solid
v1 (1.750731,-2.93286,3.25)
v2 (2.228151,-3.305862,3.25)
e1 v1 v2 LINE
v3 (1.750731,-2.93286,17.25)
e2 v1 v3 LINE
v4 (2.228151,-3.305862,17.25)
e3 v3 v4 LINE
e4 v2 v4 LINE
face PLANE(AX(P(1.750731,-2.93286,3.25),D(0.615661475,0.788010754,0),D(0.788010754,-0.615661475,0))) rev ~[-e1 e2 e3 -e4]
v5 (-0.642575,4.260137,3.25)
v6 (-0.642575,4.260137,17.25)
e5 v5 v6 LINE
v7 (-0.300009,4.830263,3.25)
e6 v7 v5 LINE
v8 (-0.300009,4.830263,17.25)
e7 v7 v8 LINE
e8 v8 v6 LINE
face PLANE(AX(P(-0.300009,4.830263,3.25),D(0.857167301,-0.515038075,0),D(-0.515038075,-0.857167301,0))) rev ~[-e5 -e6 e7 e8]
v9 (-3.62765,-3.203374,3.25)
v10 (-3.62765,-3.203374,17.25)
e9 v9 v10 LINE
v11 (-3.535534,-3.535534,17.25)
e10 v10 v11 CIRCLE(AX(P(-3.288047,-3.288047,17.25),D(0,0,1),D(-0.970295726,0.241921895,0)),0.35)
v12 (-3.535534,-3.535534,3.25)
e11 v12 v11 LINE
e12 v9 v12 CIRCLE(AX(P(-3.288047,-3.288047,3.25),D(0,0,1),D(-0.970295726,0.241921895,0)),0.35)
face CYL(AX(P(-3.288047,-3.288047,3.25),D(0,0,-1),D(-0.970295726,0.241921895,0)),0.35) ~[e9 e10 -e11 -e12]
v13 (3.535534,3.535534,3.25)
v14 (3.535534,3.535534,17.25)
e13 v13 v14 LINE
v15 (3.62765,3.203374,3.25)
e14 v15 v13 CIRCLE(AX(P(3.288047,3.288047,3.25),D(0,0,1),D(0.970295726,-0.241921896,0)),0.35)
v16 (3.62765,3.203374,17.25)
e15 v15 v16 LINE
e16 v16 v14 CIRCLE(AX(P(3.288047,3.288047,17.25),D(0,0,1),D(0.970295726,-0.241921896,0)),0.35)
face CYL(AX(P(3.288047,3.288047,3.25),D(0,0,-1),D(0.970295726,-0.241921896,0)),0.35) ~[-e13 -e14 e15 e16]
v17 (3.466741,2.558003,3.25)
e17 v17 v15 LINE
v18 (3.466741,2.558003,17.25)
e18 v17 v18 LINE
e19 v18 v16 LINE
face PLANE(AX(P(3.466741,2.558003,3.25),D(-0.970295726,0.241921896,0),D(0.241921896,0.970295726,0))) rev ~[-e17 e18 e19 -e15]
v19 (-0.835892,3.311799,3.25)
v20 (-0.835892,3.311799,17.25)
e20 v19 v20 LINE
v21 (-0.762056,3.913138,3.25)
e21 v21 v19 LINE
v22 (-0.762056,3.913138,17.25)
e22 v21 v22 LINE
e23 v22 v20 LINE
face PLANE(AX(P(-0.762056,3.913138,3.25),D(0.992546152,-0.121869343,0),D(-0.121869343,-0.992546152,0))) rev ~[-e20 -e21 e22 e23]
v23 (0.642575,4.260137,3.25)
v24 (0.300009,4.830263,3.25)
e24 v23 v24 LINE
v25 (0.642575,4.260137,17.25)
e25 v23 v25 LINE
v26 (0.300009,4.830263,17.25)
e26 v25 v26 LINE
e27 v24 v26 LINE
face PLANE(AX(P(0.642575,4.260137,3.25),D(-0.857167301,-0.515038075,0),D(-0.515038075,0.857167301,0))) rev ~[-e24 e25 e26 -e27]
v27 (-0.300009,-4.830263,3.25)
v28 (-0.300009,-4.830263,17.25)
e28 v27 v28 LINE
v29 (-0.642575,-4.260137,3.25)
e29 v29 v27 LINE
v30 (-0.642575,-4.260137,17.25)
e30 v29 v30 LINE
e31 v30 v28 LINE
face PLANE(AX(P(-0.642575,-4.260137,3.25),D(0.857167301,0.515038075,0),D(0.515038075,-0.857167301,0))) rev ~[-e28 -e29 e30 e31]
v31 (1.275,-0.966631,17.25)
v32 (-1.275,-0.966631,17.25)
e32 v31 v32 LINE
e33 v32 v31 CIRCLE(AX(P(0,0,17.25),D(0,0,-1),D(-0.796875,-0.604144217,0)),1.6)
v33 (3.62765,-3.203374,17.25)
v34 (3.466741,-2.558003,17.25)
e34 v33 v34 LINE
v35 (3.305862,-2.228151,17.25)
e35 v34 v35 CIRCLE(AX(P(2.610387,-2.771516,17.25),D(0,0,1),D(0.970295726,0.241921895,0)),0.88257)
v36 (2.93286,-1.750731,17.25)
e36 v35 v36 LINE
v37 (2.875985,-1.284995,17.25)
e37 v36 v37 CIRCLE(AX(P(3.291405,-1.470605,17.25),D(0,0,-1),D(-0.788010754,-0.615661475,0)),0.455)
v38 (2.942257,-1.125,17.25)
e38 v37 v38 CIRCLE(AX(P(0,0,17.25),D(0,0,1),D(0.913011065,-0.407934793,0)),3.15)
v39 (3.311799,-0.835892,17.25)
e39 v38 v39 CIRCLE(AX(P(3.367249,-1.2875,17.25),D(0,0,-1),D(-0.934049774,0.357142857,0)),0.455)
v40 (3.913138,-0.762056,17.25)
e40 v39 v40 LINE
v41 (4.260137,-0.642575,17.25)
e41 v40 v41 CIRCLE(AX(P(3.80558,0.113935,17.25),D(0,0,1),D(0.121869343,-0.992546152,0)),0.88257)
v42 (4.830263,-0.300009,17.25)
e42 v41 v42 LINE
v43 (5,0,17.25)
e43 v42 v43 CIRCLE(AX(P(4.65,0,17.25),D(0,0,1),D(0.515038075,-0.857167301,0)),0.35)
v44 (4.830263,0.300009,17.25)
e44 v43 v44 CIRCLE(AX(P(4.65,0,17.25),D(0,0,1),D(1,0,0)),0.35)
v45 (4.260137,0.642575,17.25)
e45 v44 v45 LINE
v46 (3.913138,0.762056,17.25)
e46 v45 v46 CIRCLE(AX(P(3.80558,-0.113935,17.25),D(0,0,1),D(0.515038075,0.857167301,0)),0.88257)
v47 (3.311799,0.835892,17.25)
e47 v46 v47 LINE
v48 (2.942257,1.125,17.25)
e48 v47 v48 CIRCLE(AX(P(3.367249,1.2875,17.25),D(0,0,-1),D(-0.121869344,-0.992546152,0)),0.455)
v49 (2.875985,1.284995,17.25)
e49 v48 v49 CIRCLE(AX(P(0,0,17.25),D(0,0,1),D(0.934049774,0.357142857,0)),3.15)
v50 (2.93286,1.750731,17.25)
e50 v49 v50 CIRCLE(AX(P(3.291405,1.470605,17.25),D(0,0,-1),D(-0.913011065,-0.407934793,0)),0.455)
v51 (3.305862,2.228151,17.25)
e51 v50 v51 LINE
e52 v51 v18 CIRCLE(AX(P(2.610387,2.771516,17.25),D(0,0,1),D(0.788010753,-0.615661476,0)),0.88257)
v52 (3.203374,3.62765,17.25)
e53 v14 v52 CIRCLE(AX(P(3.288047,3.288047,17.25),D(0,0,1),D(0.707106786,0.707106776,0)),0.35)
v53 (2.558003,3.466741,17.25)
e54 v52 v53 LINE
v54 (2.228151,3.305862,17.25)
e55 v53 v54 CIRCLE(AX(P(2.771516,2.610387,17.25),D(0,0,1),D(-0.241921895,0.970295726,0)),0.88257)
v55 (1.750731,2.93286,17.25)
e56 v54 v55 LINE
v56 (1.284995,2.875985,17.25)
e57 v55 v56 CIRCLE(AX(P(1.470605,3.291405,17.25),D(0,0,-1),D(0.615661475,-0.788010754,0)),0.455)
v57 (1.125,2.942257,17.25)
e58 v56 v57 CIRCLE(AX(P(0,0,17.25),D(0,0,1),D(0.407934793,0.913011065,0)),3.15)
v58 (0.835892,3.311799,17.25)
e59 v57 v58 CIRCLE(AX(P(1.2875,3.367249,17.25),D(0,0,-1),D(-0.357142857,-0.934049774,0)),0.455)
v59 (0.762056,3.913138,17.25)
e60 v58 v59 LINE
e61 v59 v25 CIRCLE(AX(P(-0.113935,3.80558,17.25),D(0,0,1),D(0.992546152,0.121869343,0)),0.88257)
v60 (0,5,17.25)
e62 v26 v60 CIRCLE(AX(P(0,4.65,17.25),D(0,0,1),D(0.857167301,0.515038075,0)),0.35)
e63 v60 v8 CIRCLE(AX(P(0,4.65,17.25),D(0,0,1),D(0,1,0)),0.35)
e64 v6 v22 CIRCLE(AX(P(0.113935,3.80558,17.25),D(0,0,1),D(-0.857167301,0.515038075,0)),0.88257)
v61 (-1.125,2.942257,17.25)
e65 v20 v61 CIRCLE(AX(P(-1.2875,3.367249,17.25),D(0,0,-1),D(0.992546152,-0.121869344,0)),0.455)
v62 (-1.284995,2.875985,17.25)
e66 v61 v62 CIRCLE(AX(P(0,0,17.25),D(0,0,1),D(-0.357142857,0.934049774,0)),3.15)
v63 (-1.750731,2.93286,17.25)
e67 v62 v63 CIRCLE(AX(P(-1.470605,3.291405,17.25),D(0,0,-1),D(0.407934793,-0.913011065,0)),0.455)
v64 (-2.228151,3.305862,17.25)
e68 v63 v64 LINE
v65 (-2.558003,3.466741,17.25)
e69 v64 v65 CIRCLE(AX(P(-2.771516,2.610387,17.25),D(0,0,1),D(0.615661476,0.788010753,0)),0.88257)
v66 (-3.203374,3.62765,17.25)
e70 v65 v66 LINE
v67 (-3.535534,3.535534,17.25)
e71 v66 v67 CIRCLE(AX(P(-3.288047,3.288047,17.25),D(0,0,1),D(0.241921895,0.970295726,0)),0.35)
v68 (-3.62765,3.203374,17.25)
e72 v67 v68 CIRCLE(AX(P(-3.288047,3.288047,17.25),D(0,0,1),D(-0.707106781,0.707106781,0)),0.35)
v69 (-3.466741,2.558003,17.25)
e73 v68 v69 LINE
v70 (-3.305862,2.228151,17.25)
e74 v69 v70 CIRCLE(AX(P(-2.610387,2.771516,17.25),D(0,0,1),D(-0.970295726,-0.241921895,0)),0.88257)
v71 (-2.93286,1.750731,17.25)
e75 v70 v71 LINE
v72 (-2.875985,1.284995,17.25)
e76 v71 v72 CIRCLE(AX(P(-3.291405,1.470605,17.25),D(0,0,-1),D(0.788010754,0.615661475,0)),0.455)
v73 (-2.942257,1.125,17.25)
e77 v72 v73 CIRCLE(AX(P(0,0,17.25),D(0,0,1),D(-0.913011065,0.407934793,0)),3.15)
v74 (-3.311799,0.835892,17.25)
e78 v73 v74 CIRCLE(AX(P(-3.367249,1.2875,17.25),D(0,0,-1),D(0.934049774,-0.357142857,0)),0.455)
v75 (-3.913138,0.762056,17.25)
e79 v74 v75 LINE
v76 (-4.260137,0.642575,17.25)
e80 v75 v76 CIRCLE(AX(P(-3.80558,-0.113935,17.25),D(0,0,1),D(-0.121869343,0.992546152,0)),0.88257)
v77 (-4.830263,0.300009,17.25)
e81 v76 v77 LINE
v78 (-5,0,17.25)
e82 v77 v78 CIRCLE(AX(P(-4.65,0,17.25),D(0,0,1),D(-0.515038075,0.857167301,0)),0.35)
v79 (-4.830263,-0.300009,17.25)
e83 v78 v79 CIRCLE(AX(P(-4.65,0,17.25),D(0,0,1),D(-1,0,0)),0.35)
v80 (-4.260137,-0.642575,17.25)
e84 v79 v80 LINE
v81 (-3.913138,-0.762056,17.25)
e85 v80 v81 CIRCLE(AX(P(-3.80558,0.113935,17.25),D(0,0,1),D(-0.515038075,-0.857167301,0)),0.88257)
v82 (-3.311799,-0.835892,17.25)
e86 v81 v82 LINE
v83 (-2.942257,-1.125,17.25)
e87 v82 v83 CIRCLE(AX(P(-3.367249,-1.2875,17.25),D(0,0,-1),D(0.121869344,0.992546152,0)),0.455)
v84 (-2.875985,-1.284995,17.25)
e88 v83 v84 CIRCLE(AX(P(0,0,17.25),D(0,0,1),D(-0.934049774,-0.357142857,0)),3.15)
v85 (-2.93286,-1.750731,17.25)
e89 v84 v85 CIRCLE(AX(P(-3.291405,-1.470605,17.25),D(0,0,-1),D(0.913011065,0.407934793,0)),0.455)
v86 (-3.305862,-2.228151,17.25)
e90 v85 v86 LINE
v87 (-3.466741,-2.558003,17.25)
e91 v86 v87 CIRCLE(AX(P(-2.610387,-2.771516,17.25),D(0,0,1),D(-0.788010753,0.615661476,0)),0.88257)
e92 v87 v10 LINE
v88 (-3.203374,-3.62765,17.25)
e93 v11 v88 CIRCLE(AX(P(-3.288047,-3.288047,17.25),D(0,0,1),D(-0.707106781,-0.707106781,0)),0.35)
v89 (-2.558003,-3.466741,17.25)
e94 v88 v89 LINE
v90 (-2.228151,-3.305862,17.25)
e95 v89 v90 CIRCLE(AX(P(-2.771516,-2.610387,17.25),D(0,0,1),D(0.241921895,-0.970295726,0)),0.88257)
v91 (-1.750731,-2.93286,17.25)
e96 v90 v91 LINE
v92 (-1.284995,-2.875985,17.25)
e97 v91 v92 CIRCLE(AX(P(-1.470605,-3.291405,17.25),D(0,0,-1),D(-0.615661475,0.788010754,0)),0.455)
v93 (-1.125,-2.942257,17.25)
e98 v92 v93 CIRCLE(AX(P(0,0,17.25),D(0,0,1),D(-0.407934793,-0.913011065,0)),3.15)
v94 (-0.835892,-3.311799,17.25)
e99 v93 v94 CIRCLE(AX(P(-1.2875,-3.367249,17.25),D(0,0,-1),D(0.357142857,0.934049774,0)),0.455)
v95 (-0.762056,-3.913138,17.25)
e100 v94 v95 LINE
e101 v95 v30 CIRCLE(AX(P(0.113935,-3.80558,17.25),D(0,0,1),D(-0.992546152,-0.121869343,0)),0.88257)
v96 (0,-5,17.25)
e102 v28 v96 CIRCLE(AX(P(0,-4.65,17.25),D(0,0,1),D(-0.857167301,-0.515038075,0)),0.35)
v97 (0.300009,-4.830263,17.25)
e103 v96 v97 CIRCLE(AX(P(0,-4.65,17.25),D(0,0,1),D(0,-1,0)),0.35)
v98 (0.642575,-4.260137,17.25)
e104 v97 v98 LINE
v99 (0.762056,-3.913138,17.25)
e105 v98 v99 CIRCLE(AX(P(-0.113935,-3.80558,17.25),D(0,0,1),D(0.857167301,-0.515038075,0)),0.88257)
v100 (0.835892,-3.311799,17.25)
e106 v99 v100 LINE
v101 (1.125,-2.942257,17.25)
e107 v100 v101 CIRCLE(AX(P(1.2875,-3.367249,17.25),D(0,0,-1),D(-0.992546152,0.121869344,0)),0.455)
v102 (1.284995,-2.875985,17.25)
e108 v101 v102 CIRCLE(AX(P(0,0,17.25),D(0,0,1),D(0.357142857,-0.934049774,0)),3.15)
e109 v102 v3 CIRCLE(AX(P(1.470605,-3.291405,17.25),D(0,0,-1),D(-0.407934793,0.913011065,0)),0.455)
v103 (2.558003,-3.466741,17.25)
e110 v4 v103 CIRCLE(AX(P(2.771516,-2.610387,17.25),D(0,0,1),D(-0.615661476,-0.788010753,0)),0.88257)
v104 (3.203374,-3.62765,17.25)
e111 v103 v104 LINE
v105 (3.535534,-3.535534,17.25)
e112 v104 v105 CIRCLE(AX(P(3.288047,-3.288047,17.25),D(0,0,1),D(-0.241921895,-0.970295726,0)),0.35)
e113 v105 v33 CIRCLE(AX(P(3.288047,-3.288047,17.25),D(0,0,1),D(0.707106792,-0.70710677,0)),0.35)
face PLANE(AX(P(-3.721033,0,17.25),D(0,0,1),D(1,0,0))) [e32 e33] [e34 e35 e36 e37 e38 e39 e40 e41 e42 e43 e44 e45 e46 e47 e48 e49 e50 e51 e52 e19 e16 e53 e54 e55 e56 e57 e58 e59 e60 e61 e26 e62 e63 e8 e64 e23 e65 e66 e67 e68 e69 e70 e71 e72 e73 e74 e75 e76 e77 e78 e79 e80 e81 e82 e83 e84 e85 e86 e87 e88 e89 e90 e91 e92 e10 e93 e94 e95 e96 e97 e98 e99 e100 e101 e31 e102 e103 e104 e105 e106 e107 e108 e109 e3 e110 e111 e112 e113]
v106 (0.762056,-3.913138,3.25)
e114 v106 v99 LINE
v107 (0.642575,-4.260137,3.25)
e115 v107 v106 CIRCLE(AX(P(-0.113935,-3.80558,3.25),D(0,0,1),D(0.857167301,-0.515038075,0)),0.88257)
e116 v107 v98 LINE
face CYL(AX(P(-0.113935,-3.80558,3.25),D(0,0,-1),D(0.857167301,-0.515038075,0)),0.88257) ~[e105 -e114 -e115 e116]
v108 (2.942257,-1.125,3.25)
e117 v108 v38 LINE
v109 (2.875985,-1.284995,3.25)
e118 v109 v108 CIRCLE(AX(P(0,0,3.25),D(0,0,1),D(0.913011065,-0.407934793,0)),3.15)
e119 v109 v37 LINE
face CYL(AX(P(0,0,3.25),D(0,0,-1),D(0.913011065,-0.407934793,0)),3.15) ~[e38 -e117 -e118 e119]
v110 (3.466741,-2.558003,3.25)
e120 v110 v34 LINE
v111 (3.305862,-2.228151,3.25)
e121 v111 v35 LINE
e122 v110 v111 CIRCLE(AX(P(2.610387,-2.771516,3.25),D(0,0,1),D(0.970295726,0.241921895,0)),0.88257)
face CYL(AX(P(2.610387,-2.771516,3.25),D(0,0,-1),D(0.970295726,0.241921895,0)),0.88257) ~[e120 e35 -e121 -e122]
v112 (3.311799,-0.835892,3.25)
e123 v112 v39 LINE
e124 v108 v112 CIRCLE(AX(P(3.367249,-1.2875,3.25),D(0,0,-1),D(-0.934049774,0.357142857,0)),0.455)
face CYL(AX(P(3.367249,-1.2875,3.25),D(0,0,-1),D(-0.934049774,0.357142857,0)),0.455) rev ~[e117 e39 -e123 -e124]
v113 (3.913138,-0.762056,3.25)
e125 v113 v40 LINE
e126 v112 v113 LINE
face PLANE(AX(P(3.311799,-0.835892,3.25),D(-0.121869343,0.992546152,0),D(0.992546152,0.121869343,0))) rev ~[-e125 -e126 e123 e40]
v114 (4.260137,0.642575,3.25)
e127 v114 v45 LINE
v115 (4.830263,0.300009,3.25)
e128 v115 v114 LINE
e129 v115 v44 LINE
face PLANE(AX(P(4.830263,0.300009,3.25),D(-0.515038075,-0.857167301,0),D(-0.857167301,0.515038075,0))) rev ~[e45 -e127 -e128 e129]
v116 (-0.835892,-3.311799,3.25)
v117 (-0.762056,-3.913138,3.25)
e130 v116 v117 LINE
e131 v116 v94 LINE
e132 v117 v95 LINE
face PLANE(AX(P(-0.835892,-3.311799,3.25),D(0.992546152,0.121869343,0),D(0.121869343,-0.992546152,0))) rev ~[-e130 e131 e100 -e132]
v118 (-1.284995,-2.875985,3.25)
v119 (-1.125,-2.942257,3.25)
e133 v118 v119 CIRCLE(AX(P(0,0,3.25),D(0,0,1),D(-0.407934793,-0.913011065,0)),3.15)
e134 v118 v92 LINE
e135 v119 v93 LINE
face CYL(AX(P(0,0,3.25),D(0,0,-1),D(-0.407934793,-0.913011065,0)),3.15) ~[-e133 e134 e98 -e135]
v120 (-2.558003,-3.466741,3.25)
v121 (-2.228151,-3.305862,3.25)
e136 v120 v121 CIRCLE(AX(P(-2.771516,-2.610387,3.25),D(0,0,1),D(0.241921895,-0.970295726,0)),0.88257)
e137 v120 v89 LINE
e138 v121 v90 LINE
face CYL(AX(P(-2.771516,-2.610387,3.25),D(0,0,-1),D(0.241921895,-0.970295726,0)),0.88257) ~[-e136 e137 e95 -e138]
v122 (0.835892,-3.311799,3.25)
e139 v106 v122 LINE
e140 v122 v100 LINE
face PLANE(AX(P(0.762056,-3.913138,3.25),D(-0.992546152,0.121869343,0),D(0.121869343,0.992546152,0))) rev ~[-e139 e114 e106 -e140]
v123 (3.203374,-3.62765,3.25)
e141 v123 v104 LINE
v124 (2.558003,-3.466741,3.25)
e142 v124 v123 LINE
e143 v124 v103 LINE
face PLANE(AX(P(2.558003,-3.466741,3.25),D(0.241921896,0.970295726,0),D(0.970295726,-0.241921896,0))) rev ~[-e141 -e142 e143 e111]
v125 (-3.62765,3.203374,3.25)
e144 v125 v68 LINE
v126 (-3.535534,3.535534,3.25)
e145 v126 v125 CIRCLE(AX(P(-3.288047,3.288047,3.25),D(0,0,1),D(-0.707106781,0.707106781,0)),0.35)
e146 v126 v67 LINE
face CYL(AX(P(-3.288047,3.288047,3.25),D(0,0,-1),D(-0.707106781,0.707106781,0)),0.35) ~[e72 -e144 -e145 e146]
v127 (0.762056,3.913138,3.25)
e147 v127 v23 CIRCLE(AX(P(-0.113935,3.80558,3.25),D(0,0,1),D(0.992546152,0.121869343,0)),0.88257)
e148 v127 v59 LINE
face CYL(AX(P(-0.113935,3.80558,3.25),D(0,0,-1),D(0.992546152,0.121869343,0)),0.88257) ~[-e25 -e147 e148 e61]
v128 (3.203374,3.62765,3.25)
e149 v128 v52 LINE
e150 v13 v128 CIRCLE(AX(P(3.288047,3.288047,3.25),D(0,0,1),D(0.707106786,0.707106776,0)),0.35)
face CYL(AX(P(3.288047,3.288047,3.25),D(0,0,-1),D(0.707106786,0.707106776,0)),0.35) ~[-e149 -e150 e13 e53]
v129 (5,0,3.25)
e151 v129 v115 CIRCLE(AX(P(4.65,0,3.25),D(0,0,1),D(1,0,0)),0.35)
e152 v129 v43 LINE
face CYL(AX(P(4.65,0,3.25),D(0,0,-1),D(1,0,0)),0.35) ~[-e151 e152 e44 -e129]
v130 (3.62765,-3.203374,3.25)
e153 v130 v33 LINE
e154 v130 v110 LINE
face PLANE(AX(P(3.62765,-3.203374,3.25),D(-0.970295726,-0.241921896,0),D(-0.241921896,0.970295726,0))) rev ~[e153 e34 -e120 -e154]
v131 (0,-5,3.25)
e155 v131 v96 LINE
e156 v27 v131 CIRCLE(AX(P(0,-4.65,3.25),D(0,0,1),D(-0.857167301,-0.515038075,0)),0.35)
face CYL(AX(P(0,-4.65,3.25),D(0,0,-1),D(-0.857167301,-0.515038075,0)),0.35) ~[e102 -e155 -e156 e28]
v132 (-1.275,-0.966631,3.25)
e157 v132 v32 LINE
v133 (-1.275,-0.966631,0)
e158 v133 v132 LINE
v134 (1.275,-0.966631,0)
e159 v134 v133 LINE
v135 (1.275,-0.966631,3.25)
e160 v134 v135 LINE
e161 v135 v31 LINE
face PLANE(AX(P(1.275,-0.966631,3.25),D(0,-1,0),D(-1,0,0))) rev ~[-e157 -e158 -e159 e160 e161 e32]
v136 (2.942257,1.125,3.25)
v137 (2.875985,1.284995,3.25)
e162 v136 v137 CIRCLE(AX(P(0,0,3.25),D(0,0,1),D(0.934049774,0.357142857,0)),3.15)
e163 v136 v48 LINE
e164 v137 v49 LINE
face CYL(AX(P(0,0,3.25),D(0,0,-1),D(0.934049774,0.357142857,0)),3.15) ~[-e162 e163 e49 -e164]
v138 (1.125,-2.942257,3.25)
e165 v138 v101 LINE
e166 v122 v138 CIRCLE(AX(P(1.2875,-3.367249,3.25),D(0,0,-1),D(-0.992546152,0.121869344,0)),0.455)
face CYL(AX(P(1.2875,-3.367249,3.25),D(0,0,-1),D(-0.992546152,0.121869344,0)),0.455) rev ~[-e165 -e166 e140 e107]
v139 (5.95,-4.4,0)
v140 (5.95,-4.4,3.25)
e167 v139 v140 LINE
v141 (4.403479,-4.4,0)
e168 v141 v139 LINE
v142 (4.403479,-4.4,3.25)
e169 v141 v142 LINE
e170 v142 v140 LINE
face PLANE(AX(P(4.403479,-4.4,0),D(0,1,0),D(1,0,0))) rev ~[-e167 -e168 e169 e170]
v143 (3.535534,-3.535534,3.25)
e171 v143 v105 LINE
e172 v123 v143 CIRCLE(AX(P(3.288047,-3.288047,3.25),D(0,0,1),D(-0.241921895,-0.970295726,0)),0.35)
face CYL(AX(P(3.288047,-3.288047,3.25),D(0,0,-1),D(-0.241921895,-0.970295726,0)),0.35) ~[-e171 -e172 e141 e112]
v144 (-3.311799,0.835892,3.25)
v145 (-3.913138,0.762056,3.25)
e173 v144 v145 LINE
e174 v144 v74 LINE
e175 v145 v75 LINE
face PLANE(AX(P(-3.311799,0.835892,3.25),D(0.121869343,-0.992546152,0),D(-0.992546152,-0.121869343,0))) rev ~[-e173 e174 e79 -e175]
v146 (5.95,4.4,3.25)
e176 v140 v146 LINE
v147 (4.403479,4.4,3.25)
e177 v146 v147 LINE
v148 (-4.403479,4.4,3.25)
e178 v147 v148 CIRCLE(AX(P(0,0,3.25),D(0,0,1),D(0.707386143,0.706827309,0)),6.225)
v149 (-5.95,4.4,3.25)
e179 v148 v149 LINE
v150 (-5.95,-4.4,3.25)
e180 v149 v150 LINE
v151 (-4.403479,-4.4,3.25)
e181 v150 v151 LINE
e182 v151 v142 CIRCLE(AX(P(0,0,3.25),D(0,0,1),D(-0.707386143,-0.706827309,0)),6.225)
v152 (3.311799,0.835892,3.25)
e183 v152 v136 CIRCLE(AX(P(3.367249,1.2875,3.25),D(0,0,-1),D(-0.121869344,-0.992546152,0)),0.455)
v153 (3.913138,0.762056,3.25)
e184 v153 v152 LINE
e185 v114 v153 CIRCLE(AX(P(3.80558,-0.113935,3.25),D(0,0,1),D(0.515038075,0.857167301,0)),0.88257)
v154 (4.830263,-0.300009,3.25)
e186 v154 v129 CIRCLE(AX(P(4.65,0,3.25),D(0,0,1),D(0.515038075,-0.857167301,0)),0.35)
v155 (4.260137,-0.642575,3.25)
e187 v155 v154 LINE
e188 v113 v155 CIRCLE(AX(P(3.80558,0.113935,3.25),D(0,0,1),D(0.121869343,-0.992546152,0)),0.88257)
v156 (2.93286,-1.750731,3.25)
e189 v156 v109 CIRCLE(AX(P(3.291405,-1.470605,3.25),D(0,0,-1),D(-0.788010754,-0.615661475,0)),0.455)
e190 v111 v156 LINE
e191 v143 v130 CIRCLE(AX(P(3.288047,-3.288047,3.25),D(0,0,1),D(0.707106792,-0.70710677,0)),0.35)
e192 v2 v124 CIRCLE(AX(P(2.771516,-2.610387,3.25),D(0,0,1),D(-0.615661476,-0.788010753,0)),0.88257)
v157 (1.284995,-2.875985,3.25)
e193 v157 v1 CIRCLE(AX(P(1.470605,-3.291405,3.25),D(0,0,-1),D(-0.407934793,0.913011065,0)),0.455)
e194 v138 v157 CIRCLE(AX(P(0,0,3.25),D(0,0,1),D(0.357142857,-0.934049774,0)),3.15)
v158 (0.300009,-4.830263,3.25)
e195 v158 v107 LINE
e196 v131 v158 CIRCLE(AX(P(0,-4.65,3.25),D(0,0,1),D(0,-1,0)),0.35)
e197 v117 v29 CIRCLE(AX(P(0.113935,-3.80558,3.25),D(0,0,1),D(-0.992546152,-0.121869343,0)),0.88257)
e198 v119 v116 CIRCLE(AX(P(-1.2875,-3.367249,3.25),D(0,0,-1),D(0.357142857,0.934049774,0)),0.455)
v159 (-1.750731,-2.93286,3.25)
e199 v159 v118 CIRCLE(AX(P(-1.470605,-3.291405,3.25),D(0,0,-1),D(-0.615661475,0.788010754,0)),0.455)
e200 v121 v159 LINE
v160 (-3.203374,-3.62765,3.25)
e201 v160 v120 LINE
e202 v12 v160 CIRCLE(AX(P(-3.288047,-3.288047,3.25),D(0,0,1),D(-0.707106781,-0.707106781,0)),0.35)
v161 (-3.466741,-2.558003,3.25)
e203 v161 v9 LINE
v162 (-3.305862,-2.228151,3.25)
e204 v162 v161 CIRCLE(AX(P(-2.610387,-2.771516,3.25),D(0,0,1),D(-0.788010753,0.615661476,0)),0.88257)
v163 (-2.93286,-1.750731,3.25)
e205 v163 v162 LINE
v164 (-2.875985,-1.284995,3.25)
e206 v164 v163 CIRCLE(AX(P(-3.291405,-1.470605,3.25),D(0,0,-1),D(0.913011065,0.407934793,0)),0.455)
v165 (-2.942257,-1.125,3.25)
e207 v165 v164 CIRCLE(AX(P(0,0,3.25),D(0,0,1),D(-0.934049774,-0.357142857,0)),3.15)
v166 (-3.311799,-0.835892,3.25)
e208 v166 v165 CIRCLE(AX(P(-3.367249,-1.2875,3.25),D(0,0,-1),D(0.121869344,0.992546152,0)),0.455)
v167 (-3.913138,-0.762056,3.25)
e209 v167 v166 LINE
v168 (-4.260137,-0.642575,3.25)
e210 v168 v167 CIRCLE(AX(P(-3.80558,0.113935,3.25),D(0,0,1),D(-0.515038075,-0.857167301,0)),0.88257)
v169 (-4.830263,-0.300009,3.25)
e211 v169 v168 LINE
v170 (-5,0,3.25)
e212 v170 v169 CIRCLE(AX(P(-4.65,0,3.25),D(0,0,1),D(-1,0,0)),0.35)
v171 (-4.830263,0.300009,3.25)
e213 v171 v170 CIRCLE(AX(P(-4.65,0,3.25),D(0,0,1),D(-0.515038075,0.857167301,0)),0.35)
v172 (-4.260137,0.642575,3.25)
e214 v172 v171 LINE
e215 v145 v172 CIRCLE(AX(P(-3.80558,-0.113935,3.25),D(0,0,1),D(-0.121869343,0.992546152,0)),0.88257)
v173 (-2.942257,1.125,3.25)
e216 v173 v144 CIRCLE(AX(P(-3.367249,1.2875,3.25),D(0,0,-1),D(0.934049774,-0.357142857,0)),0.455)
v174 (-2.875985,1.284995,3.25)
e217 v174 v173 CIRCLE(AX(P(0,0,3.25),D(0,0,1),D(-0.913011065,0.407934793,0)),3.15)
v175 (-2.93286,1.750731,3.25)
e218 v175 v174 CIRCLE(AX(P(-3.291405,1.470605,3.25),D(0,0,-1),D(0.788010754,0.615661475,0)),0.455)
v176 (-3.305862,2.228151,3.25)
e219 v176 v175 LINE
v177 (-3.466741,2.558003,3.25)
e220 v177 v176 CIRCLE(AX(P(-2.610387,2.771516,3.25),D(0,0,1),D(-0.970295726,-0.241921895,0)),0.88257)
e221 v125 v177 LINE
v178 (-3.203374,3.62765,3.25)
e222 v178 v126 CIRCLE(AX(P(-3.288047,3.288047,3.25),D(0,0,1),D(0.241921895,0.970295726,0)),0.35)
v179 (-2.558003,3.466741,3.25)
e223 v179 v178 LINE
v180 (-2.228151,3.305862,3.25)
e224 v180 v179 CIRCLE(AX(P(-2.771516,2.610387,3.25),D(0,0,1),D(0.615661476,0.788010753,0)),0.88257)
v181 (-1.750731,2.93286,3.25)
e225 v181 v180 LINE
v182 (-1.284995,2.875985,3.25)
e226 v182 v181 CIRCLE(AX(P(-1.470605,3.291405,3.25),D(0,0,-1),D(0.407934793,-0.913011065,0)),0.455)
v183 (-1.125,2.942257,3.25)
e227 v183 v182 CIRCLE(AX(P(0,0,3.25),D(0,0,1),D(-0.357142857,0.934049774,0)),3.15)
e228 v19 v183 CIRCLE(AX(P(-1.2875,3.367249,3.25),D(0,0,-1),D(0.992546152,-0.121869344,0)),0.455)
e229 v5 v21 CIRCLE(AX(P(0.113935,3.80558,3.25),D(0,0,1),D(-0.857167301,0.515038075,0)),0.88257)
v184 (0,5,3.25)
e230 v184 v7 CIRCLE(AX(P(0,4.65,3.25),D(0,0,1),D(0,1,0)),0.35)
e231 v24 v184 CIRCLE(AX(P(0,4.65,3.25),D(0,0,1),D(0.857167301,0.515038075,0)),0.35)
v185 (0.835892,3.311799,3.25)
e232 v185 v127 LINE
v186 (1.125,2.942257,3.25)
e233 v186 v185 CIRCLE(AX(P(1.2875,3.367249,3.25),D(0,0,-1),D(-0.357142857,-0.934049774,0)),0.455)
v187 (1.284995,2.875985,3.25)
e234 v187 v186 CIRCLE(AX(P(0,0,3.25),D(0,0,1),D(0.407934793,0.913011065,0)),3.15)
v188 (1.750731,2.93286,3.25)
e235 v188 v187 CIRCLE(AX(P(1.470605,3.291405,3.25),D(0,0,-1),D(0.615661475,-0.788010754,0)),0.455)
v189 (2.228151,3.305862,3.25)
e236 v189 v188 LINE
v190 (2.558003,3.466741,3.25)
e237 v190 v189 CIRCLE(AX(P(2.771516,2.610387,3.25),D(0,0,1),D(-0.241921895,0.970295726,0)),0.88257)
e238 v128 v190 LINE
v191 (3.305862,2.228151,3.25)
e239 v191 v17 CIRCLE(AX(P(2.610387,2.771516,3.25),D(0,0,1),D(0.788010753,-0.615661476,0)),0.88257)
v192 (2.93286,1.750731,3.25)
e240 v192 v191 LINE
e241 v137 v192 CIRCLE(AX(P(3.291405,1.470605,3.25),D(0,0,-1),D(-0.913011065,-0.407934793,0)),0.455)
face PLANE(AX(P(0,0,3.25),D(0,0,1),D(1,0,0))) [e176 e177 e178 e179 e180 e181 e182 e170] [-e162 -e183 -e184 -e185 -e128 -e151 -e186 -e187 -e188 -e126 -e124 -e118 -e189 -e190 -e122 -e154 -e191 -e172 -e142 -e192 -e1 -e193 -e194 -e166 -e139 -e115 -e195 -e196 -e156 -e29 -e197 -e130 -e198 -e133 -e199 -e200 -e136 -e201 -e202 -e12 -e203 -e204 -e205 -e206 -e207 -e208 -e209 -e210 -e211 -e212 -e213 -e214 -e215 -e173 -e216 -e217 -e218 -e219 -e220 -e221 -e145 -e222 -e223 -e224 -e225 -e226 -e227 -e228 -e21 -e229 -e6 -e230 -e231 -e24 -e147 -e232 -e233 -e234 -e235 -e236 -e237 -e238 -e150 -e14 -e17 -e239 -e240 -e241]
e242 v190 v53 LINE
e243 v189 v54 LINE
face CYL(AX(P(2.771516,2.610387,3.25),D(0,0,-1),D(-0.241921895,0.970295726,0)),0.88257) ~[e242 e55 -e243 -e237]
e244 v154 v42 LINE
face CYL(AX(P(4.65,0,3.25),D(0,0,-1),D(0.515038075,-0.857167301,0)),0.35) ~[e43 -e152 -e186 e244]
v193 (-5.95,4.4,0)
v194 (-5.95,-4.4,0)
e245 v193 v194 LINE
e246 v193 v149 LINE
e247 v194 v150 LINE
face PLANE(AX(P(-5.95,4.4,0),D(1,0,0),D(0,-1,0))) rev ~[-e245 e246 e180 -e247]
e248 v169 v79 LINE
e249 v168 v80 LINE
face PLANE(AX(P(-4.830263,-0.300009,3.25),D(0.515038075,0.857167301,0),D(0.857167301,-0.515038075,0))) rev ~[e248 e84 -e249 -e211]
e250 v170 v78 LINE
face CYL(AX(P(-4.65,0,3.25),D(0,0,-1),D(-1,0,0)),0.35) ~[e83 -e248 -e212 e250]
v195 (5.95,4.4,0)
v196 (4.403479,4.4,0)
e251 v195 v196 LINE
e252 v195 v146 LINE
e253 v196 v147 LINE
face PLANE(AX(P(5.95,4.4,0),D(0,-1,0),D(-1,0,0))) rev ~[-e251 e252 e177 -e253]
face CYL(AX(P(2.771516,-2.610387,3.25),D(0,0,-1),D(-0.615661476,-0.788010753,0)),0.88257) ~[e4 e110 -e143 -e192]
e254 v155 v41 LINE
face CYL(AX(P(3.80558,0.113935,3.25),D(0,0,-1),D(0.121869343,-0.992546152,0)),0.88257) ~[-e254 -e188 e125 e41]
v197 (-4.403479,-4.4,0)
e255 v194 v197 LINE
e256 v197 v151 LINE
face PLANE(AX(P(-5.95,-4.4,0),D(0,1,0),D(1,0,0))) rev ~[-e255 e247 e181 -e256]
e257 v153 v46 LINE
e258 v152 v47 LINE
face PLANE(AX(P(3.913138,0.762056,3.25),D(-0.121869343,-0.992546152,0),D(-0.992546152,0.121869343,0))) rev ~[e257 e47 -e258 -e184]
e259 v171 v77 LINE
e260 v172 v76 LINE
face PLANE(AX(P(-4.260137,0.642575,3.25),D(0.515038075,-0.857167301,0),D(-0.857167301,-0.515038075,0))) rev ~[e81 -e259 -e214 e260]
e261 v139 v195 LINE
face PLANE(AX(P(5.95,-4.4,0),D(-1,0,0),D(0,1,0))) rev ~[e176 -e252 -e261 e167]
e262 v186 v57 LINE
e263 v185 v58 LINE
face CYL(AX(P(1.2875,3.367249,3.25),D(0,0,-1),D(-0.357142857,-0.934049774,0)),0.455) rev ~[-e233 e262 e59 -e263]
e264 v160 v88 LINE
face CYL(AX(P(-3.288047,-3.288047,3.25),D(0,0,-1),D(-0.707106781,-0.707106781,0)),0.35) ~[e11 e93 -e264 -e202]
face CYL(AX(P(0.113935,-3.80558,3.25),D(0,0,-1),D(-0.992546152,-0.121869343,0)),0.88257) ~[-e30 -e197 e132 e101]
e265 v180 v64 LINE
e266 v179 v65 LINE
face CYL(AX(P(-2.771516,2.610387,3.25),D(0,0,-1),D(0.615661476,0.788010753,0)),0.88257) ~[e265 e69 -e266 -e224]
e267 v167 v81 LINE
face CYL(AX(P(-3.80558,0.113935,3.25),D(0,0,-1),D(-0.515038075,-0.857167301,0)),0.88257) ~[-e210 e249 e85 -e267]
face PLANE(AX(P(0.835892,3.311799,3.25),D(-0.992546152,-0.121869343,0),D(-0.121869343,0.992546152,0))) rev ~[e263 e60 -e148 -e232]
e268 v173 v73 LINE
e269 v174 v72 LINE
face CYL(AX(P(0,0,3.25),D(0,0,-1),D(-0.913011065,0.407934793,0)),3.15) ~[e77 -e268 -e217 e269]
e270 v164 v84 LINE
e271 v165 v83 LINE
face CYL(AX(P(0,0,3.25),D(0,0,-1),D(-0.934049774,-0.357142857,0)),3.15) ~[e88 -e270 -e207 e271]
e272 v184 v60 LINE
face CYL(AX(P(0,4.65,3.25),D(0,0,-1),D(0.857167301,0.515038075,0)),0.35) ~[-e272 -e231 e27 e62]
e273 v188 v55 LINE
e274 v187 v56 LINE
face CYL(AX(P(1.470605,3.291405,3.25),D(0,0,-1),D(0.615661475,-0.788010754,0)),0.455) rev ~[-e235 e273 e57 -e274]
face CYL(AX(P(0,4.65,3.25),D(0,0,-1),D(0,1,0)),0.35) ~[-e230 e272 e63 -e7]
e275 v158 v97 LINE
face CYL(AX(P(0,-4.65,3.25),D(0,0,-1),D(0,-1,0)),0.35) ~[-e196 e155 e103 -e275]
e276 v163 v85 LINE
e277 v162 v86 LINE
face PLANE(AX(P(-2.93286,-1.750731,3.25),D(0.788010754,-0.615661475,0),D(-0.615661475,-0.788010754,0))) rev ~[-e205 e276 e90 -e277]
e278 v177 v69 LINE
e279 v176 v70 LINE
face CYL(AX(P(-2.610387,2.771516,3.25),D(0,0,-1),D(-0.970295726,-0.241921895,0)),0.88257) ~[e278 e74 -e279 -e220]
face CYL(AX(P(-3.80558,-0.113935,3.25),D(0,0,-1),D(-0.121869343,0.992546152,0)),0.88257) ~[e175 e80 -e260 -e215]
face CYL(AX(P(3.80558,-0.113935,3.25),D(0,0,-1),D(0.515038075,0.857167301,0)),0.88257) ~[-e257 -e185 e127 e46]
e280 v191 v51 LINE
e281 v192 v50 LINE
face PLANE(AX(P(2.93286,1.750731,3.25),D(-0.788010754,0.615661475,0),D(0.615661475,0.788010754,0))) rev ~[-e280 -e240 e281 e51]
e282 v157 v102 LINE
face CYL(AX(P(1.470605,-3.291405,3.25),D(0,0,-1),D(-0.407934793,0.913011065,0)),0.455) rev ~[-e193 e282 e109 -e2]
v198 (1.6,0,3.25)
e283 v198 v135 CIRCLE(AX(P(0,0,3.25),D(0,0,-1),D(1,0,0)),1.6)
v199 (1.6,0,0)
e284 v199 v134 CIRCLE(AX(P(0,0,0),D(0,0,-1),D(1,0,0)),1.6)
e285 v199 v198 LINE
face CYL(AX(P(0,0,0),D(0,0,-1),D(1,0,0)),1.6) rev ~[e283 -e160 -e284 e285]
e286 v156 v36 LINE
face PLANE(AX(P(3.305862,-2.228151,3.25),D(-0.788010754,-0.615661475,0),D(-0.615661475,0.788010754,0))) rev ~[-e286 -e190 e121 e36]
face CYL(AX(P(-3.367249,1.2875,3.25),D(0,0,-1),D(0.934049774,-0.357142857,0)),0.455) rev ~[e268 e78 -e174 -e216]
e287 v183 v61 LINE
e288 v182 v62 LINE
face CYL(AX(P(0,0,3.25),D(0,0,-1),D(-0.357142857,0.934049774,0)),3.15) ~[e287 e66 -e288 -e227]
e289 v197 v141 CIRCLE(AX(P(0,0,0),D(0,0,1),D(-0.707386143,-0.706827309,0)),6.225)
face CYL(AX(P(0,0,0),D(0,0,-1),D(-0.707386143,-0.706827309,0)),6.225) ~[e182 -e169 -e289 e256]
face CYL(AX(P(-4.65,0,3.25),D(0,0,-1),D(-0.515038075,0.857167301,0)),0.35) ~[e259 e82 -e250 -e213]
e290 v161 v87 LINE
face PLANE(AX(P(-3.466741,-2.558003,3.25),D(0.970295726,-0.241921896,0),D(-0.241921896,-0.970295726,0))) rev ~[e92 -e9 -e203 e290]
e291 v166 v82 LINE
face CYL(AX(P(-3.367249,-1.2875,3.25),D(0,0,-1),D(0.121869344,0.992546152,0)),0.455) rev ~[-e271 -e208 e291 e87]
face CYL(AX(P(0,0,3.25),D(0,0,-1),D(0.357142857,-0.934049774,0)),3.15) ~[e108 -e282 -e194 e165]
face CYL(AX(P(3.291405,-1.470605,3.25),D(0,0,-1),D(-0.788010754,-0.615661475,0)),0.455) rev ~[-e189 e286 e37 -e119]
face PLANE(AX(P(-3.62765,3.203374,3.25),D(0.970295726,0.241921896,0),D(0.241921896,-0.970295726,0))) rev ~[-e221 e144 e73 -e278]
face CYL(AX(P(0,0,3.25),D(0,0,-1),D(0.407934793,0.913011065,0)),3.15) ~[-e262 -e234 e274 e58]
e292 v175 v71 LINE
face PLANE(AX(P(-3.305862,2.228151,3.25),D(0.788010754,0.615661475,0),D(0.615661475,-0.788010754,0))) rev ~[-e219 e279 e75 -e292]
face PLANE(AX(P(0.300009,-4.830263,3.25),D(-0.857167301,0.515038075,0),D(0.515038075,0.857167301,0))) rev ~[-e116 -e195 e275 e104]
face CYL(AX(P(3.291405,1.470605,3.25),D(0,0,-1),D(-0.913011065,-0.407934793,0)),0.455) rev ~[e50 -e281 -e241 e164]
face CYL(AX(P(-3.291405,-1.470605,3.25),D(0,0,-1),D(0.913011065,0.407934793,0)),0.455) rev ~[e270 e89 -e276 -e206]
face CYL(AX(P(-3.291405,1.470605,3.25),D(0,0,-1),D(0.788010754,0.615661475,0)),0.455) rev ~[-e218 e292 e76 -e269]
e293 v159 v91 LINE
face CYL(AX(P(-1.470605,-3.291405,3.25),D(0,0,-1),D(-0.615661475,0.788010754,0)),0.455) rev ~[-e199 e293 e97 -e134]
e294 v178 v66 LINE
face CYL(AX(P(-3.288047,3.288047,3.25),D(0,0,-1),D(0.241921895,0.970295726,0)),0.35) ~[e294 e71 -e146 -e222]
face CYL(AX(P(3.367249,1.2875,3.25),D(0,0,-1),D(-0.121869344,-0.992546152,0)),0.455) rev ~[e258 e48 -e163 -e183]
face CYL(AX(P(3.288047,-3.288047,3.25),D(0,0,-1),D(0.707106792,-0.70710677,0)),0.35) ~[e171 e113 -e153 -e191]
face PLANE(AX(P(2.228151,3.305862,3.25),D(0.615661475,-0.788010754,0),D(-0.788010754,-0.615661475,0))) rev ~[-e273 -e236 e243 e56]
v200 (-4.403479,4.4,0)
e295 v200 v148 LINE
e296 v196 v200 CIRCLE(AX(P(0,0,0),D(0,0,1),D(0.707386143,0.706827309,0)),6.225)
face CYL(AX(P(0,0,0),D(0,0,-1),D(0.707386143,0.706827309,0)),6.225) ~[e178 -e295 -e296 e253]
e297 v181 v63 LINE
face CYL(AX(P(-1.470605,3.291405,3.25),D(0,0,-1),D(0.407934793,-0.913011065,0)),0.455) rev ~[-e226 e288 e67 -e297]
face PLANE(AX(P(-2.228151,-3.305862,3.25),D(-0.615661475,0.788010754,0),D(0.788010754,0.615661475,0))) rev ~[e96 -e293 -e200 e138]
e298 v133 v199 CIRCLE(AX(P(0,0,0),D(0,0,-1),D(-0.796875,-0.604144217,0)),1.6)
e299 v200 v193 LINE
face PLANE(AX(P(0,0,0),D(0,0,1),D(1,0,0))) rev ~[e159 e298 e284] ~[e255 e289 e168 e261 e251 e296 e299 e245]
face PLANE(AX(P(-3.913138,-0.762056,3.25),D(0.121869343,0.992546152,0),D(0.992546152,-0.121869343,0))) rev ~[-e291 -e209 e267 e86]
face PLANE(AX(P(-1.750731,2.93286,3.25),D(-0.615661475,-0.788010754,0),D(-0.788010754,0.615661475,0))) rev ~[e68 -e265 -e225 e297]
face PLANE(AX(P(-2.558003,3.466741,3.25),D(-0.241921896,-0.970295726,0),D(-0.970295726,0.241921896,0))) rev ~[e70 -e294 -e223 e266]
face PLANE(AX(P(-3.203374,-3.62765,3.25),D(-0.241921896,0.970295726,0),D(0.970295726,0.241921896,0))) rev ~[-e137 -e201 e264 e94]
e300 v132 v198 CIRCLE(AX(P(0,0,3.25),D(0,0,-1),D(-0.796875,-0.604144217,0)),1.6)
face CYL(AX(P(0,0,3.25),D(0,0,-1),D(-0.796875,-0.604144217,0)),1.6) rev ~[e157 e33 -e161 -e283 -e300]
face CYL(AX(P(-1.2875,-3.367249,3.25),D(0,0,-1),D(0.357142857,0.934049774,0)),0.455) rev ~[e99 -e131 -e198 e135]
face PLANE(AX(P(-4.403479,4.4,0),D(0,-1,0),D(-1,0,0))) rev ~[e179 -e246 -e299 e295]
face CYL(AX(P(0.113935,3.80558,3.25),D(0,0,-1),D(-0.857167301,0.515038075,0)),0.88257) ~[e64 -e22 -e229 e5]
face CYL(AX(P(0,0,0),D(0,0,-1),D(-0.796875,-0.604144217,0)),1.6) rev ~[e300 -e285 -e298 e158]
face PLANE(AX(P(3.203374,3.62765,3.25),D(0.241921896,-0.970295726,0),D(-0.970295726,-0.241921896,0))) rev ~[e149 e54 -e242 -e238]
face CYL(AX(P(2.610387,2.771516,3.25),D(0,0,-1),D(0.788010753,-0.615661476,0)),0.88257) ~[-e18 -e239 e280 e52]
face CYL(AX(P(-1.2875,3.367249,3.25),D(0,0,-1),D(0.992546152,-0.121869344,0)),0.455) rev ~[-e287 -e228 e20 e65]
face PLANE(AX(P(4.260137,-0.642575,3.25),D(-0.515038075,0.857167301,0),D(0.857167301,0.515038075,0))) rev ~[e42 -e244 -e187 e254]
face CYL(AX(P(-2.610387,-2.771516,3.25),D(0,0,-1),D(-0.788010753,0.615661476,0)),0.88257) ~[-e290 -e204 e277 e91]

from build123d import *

# Parameters (mm, degrees)
F0_R     = 5
F0_R_2   = 3.15
F0_R_3   = 2.55
F1_DEPTH = 3.25
F2_R     = 2.55
F3_DEPTH = 14


# Not quite as in the source:
# - a feature names something its author has since deleted; it is built from what else it names


with BuildPart() as f1:
    # F0 (on Top) → F1 (new body)
    with BuildSketch(Plane.XY):
        with BuildLine():
            Line((-5.95, -4.4), (-4.4034787385, -4.4))
            ThreePointArc((-4.4034787385, -4.4), (0, -6.225), (4.4034787385, -4.4))
            Line((4.4034787385, -4.4), (5.95, -4.4))
            Line((5.95, -4.4), (5.95, 4.4))
            Line((5.95, 4.4), (4.4034787385, 4.4))
            ThreePointArc((4.4034787385, 4.4), (0, 6.225), (-4.4034787385, 4.4))
            Line((-4.4034787385, 4.4), (-5.95, 4.4))
            Line((-5.95, 4.4), (-5.95, -4.4))
        make_face()
        Circle(F0_R, mode=Mode.SUBTRACT)
        Circle(F0_R)
        Circle(F0_R_2, mode=Mode.SUBTRACT)
        Circle(F0_R_2)
        Circle(F0_R_3, mode=Mode.SUBTRACT)
        Circle(F0_R_3)
        with BuildLine():
            ThreePointArc((-1.275, -0.9666307465), (-0.5099019514, 1.5165750888), (1.6, 0))
            ThreePointArc((1.6, 0), (1.5165750888, -0.5099019514), (1.275, -0.9666307465))
            ThreePointArc((1.275, -0.9666307465), (0, -1.6), (-1.275, -0.9666307465))
        make_face(mode=Mode.SUBTRACT)
        with BuildLine():
            Line((1.275, -0.9666307465), (-1.275, -0.9666307465))
            ThreePointArc((-1.275, -0.9666307465), (0, -1.6), (1.275, -0.9666307465))
        make_face()
    extrude(amount=F1_DEPTH)

    # F2 (on face) → F3 (join)
    with BuildSketch(Plane.XY.offset(3.25)):
        with BuildLine():
            ThreePointArc((-4.8302633262, 0.3000085552), (-4.9546244936, 0.172348246), (-5, 0))
            ThreePointArc((-5, 0), (-4.9546244936, -0.172348246), (-4.8302633262, -0.3000085552))
            Line((-4.8302633262, -0.3000085552), (-4.2601369618, -0.6425750355))
            ThreePointArc((-4.2601369618, -0.6425750355), (-4.0929165173, -0.7205512094), (-3.9131380826, -0.7620563314))
            Line((-3.9131380826, -0.7620563314), (-3.3117988826, -0.835891501))
            ThreePointArc((-3.3117988826, -0.835891501), (-3.0868883315, -0.9291389359), (-2.9422567869, -1.125))
            ThreePointArc((-2.9422567869, -1.125), (-3.15, 0), (-2.9422567869, 1.125))
            ThreePointArc((-2.9422567869, 1.125), (-3.0868883315, 0.9291389359), (-3.3117988826, 0.835891501))
            Line((-3.3117988826, 0.835891501), (-3.9131380826, 0.7620563314))
            ThreePointArc((-3.9131380826, 0.7620563314), (-4.0929165173, 0.7205512094), (-4.2601369618, 0.6425750355))
            Line((-4.2601369618, 0.6425750355), (-4.8302633262, 0.3000085552))
        make_face()
        with BuildLine():
            ThreePointArc((-3.2033738691, 3.6276500367), (-3.3815799641, 3.6253171911), (-3.5355339059, 3.5355339059))
            ThreePointArc((-3.5355339059, 3.5355339059), (-3.6253171911, 3.3815799641), (-3.6276500367, 3.2033738691))
            Line((-3.6276500367, 3.2033738691), (-3.4667408995, 2.5580025694))
            ThreePointArc((-3.4667408995, 2.5580025694), (-3.4036356706, 2.3846223779), (-3.3058616735, 2.2281512744))
            Line((-3.3058616735, 2.2281512744), (-2.9328599965, 1.7507308991))
            ThreePointArc((-2.9328599965, 1.7507308991), (-2.8397601142, 1.5257592297), (-2.8759848548, 1.2849945972))
            ThreePointArc((-2.8759848548, 1.2849945972), (-2.2273863607, 2.2273863607), (-1.2849945972, 2.8759848548))
            ThreePointArc((-1.2849945972, 2.8759848548), (-1.5257592297, 2.8397601142), (-1.7507308991, 2.9328599965))
            Line((-1.7507308991, 2.9328599965), (-2.2281512744, 3.3058616735))
            ThreePointArc((-2.2281512744, 3.3058616735), (-2.3846223779, 3.4036356706), (-2.5580025694, 3.4667408995))
            Line((-2.5580025694, 3.4667408995), (-3.2033738691, 3.6276500367))
        make_face()
        with BuildLine():
            ThreePointArc((0.3000085552, 4.8302633262), (0.172348246, 4.9546244936), (0, 5))
            ThreePointArc((0, 5), (-0.172348246, 4.9546244936), (-0.3000085552, 4.8302633262))
            Line((-0.3000085552, 4.8302633262), (-0.6425750355, 4.2601369618))
            ThreePointArc((-0.6425750355, 4.2601369618), (-0.7205512094, 4.0929165173), (-0.7620563314, 3.9131380826))
            Line((-0.7620563314, 3.9131380826), (-0.835891501, 3.3117988826))
            ThreePointArc((-0.835891501, 3.3117988826), (-0.9291389359, 3.0868883315), (-1.125, 2.9422567869))
            ThreePointArc((-1.125, 2.9422567869), (0, 3.15), (1.125, 2.9422567869))
            ThreePointArc((1.125, 2.9422567869), (0.9291389359, 3.0868883315), (0.835891501, 3.3117988826))
            Line((0.835891501, 3.3117988826), (0.7620563314, 3.9131380826))
            ThreePointArc((0.7620563314, 3.9131380826), (0.7205512094, 4.0929165173), (0.6425750355, 4.2601369618))
            Line((0.6425750355, 4.2601369618), (0.3000085552, 4.8302633262))
        make_face()
        with BuildLine():
            ThreePointArc((3.2033738691, -3.6276500367), (3.3815799667, -3.6253171904), (3.5355339096, -3.5355339023))
            ThreePointArc((3.5355339096, -3.5355339023), (3.6253171918, -3.3815799616), (3.6276500367, -3.2033738691))
            Line((3.6276500367, -3.2033738691), (3.4667408995, -2.5580025694))
            ThreePointArc((3.4667408995, -2.5580025694), (3.4036356706, -2.3846223779), (3.3058616735, -2.2281512744))
            Line((3.3058616735, -2.2281512744), (2.9328599965, -1.7507308991))
            ThreePointArc((2.9328599965, -1.7507308991), (2.8397601142, -1.5257592297), (2.8759848548, -1.2849945972))
            ThreePointArc((2.8759848548, -1.2849945972), (2.2273863607, -2.2273863607), (1.2849945972, -2.8759848548))
            ThreePointArc((1.2849945972, -2.8759848548), (1.5257592297, -2.8397601142), (1.7507308991, -2.9328599965))
            Line((1.7507308991, -2.9328599965), (2.2281512744, -3.3058616735))
            ThreePointArc((2.2281512744, -3.3058616735), (2.3846223779, -3.4036356706), (2.5580025694, -3.4667408995))
            Line((2.5580025694, -3.4667408995), (3.2033738691, -3.6276500367))
        make_face()
        with BuildLine():
            ThreePointArc((-0.3000085552, -4.8302633262), (-0.172348246, -4.9546244936), (0, -5))
            ThreePointArc((0, -5), (0.172348246, -4.9546244936), (0.3000085552, -4.8302633262))
            Line((0.3000085552, -4.8302633262), (0.6425750355, -4.2601369618))
            ThreePointArc((0.6425750355, -4.2601369618), (0.7205512094, -4.0929165173), (0.7620563314, -3.9131380826))
            Line((0.7620563314, -3.9131380826), (0.835891501, -3.3117988826))
            ThreePointArc((0.835891501, -3.3117988826), (0.9291389359, -3.0868883315), (1.125, -2.9422567869))
            ThreePointArc((1.125, -2.9422567869), (0, -3.15), (-1.125, -2.9422567869))
            ThreePointArc((-1.125, -2.9422567869), (-0.9291389359, -3.0868883315), (-0.835891501, -3.3117988826))
            Line((-0.835891501, -3.3117988826), (-0.7620563314, -3.9131380826))
            ThreePointArc((-0.7620563314, -3.9131380826), (-0.7205512094, -4.0929165173), (-0.6425750355, -4.2601369618))
            Line((-0.6425750355, -4.2601369618), (-0.3000085552, -4.8302633262))
        make_face()
        with BuildLine():
            ThreePointArc((-3.6276500367, -3.2033738691), (-3.6253171911, -3.3815799641), (-3.5355339059, -3.5355339059))
            ThreePointArc((-3.5355339059, -3.5355339059), (-3.3815799641, -3.6253171911), (-3.2033738691, -3.6276500367))
            Line((-3.2033738691, -3.6276500367), (-2.5580025694, -3.4667408995))
            ThreePointArc((-2.5580025694, -3.4667408995), (-2.3846223779, -3.4036356706), (-2.2281512744, -3.3058616735))
            Line((-2.2281512744, -3.3058616735), (-1.7507308991, -2.9328599965))
            ThreePointArc((-1.7507308991, -2.9328599965), (-1.5257592297, -2.8397601142), (-1.2849945972, -2.8759848548))
            ThreePointArc((-1.2849945972, -2.8759848548), (-2.2273863607, -2.2273863607), (-2.8759848548, -1.2849945972))
            ThreePointArc((-2.8759848548, -1.2849945972), (-2.8397601142, -1.5257592297), (-2.9328599965, -1.7507308991))
            Line((-2.9328599965, -1.7507308991), (-3.3058616735, -2.2281512744))
            ThreePointArc((-3.3058616735, -2.2281512744), (-3.4036356706, -2.3846223779), (-3.4667408995, -2.5580025694))
            Line((-3.4667408995, -2.5580025694), (-3.6276500367, -3.2033738691))
        make_face()
        with BuildLine():
            ThreePointArc((2.8759848548, -1.2849945972), (2.9102205274, -1.205452812), (2.9422567869, -1.125))
            ThreePointArc((2.9422567869, -1.125), (3.0976288414, -0.5720101054), (3.15, 0))
            ThreePointArc((3.15, 0), (3.0976288414, 0.5720101054), (2.9422567869, 1.125))
            ThreePointArc((2.9422567869, 1.125), (2.9102205274, 1.205452812), (2.8759848548, 1.2849945972))
            ThreePointArc((2.8759848548, 1.2849945972), (2.2273863607, 2.2273863607), (1.2849945972, 2.8759848548))
            ThreePointArc((1.2849945972, 2.8759848548), (1.205452812, 2.9102205274), (1.125, 2.9422567869))
            ThreePointArc((1.125, 2.9422567869), (0, 3.15), (-1.125, 2.9422567869))
            ThreePointArc((-1.125, 2.9422567869), (-1.205452812, 2.9102205274), (-1.2849945972, 2.8759848548))
            ThreePointArc((-1.2849945972, 2.8759848548), (-2.2273863607, 2.2273863607), (-2.8759848548, 1.2849945972))
            ThreePointArc((-2.8759848548, 1.2849945972), (-2.9102205274, 1.205452812), (-2.9422567869, 1.125))
            ThreePointArc((-2.9422567869, 1.125), (-3.15, 0), (-2.9422567869, -1.125))
            ThreePointArc((-2.9422567869, -1.125), (-2.9102205274, -1.205452812), (-2.8759848548, -1.2849945972))
            ThreePointArc((-2.8759848548, -1.2849945972), (-2.2273863607, -2.2273863607), (-1.2849945972, -2.8759848548))
            ThreePointArc((-1.2849945972, -2.8759848548), (-1.205452812, -2.9102205274), (-1.125, -2.9422567869))
            ThreePointArc((-1.125, -2.9422567869), (0, -3.15), (1.125, -2.9422567869))
            ThreePointArc((1.125, -2.9422567869), (1.205452812, -2.9102205274), (1.2849945972, -2.8759848548))
            ThreePointArc((1.2849945972, -2.8759848548), (2.2273863607, -2.2273863607), (2.8759848548, -1.2849945972))
        make_face()
        Circle(F2_R, mode=Mode.SUBTRACT)
        Circle(F2_R)
        with BuildLine():
            ThreePointArc((-1.275, -0.9666307465), (0, 1.6), (1.275, -0.9666307465))
            Line((1.275, -0.9666307465), (-1.275, -0.9666307465))
        make_face(mode=Mode.SUBTRACT)
        with BuildLine():
            ThreePointArc((3.6276500367, 3.2033738691), (3.6253171915, 3.3815799629), (3.5355339078, 3.5355339041))
            ThreePointArc((3.5355339078, 3.5355339041), (3.3815799654, 3.6253171908), (3.2033738691, 3.6276500367))
            Line((3.2033738691, 3.6276500367), (2.5580025694, 3.4667408995))
            ThreePointArc((2.5580025694, 3.4667408995), (2.3846223779, 3.4036356706), (2.2281512744, 3.3058616735))
            Line((2.2281512744, 3.3058616735), (1.7507308991, 2.9328599965))
            ThreePointArc((1.7507308991, 2.9328599965), (1.5257592297, 2.8397601142), (1.2849945972, 2.8759848548))
            ThreePointArc((1.2849945972, 2.8759848548), (2.2273863607, 2.2273863607), (2.8759848548, 1.2849945972))
            ThreePointArc((2.8759848548, 1.2849945972), (2.8397601142, 1.5257592297), (2.9328599965, 1.7507308991))
            Line((2.9328599965, 1.7507308991), (3.3058616735, 2.2281512744))
            ThreePointArc((3.3058616735, 2.2281512744), (3.4036356706, 2.3846223779), (3.4667408995, 2.5580025694))
            Line((3.4667408995, 2.5580025694), (3.6276500367, 3.2033738691))
        make_face()
        with BuildLine():
            ThreePointArc((4.8302633262, -0.3000085552), (4.9546244936, -0.172348246), (5, 0))
            ThreePointArc((5, 0), (4.9546244936, 0.172348246), (4.8302633262, 0.3000085552))
            Line((4.8302633262, 0.3000085552), (4.2601369618, 0.6425750355))
            ThreePointArc((4.2601369618, 0.6425750355), (4.0929165173, 0.7205512094), (3.9131380826, 0.7620563314))
            Line((3.9131380826, 0.7620563314), (3.3117988826, 0.835891501))
            ThreePointArc((3.3117988826, 0.835891501), (3.0868883315, 0.9291389359), (2.9422567869, 1.125))
            ThreePointArc((2.9422567869, 1.125), (3.0976288414, 0.5720101054), (3.15, 0))
            ThreePointArc((3.15, 0), (3.0976288414, -0.5720101054), (2.9422567869, -1.125))
            ThreePointArc((2.9422567869, -1.125), (3.0868883315, -0.9291389359), (3.3117988826, -0.835891501))
            Line((3.3117988826, -0.835891501), (3.9131380826, -0.7620563314))
            ThreePointArc((3.9131380826, -0.7620563314), (4.0929165173, -0.7205512094), (4.2601369618, -0.6425750355))
            Line((4.2601369618, -0.6425750355), (4.8302633262, -0.3000085552))
        make_face()
    extrude(amount=F3_DEPTH)


solid = f1.part
